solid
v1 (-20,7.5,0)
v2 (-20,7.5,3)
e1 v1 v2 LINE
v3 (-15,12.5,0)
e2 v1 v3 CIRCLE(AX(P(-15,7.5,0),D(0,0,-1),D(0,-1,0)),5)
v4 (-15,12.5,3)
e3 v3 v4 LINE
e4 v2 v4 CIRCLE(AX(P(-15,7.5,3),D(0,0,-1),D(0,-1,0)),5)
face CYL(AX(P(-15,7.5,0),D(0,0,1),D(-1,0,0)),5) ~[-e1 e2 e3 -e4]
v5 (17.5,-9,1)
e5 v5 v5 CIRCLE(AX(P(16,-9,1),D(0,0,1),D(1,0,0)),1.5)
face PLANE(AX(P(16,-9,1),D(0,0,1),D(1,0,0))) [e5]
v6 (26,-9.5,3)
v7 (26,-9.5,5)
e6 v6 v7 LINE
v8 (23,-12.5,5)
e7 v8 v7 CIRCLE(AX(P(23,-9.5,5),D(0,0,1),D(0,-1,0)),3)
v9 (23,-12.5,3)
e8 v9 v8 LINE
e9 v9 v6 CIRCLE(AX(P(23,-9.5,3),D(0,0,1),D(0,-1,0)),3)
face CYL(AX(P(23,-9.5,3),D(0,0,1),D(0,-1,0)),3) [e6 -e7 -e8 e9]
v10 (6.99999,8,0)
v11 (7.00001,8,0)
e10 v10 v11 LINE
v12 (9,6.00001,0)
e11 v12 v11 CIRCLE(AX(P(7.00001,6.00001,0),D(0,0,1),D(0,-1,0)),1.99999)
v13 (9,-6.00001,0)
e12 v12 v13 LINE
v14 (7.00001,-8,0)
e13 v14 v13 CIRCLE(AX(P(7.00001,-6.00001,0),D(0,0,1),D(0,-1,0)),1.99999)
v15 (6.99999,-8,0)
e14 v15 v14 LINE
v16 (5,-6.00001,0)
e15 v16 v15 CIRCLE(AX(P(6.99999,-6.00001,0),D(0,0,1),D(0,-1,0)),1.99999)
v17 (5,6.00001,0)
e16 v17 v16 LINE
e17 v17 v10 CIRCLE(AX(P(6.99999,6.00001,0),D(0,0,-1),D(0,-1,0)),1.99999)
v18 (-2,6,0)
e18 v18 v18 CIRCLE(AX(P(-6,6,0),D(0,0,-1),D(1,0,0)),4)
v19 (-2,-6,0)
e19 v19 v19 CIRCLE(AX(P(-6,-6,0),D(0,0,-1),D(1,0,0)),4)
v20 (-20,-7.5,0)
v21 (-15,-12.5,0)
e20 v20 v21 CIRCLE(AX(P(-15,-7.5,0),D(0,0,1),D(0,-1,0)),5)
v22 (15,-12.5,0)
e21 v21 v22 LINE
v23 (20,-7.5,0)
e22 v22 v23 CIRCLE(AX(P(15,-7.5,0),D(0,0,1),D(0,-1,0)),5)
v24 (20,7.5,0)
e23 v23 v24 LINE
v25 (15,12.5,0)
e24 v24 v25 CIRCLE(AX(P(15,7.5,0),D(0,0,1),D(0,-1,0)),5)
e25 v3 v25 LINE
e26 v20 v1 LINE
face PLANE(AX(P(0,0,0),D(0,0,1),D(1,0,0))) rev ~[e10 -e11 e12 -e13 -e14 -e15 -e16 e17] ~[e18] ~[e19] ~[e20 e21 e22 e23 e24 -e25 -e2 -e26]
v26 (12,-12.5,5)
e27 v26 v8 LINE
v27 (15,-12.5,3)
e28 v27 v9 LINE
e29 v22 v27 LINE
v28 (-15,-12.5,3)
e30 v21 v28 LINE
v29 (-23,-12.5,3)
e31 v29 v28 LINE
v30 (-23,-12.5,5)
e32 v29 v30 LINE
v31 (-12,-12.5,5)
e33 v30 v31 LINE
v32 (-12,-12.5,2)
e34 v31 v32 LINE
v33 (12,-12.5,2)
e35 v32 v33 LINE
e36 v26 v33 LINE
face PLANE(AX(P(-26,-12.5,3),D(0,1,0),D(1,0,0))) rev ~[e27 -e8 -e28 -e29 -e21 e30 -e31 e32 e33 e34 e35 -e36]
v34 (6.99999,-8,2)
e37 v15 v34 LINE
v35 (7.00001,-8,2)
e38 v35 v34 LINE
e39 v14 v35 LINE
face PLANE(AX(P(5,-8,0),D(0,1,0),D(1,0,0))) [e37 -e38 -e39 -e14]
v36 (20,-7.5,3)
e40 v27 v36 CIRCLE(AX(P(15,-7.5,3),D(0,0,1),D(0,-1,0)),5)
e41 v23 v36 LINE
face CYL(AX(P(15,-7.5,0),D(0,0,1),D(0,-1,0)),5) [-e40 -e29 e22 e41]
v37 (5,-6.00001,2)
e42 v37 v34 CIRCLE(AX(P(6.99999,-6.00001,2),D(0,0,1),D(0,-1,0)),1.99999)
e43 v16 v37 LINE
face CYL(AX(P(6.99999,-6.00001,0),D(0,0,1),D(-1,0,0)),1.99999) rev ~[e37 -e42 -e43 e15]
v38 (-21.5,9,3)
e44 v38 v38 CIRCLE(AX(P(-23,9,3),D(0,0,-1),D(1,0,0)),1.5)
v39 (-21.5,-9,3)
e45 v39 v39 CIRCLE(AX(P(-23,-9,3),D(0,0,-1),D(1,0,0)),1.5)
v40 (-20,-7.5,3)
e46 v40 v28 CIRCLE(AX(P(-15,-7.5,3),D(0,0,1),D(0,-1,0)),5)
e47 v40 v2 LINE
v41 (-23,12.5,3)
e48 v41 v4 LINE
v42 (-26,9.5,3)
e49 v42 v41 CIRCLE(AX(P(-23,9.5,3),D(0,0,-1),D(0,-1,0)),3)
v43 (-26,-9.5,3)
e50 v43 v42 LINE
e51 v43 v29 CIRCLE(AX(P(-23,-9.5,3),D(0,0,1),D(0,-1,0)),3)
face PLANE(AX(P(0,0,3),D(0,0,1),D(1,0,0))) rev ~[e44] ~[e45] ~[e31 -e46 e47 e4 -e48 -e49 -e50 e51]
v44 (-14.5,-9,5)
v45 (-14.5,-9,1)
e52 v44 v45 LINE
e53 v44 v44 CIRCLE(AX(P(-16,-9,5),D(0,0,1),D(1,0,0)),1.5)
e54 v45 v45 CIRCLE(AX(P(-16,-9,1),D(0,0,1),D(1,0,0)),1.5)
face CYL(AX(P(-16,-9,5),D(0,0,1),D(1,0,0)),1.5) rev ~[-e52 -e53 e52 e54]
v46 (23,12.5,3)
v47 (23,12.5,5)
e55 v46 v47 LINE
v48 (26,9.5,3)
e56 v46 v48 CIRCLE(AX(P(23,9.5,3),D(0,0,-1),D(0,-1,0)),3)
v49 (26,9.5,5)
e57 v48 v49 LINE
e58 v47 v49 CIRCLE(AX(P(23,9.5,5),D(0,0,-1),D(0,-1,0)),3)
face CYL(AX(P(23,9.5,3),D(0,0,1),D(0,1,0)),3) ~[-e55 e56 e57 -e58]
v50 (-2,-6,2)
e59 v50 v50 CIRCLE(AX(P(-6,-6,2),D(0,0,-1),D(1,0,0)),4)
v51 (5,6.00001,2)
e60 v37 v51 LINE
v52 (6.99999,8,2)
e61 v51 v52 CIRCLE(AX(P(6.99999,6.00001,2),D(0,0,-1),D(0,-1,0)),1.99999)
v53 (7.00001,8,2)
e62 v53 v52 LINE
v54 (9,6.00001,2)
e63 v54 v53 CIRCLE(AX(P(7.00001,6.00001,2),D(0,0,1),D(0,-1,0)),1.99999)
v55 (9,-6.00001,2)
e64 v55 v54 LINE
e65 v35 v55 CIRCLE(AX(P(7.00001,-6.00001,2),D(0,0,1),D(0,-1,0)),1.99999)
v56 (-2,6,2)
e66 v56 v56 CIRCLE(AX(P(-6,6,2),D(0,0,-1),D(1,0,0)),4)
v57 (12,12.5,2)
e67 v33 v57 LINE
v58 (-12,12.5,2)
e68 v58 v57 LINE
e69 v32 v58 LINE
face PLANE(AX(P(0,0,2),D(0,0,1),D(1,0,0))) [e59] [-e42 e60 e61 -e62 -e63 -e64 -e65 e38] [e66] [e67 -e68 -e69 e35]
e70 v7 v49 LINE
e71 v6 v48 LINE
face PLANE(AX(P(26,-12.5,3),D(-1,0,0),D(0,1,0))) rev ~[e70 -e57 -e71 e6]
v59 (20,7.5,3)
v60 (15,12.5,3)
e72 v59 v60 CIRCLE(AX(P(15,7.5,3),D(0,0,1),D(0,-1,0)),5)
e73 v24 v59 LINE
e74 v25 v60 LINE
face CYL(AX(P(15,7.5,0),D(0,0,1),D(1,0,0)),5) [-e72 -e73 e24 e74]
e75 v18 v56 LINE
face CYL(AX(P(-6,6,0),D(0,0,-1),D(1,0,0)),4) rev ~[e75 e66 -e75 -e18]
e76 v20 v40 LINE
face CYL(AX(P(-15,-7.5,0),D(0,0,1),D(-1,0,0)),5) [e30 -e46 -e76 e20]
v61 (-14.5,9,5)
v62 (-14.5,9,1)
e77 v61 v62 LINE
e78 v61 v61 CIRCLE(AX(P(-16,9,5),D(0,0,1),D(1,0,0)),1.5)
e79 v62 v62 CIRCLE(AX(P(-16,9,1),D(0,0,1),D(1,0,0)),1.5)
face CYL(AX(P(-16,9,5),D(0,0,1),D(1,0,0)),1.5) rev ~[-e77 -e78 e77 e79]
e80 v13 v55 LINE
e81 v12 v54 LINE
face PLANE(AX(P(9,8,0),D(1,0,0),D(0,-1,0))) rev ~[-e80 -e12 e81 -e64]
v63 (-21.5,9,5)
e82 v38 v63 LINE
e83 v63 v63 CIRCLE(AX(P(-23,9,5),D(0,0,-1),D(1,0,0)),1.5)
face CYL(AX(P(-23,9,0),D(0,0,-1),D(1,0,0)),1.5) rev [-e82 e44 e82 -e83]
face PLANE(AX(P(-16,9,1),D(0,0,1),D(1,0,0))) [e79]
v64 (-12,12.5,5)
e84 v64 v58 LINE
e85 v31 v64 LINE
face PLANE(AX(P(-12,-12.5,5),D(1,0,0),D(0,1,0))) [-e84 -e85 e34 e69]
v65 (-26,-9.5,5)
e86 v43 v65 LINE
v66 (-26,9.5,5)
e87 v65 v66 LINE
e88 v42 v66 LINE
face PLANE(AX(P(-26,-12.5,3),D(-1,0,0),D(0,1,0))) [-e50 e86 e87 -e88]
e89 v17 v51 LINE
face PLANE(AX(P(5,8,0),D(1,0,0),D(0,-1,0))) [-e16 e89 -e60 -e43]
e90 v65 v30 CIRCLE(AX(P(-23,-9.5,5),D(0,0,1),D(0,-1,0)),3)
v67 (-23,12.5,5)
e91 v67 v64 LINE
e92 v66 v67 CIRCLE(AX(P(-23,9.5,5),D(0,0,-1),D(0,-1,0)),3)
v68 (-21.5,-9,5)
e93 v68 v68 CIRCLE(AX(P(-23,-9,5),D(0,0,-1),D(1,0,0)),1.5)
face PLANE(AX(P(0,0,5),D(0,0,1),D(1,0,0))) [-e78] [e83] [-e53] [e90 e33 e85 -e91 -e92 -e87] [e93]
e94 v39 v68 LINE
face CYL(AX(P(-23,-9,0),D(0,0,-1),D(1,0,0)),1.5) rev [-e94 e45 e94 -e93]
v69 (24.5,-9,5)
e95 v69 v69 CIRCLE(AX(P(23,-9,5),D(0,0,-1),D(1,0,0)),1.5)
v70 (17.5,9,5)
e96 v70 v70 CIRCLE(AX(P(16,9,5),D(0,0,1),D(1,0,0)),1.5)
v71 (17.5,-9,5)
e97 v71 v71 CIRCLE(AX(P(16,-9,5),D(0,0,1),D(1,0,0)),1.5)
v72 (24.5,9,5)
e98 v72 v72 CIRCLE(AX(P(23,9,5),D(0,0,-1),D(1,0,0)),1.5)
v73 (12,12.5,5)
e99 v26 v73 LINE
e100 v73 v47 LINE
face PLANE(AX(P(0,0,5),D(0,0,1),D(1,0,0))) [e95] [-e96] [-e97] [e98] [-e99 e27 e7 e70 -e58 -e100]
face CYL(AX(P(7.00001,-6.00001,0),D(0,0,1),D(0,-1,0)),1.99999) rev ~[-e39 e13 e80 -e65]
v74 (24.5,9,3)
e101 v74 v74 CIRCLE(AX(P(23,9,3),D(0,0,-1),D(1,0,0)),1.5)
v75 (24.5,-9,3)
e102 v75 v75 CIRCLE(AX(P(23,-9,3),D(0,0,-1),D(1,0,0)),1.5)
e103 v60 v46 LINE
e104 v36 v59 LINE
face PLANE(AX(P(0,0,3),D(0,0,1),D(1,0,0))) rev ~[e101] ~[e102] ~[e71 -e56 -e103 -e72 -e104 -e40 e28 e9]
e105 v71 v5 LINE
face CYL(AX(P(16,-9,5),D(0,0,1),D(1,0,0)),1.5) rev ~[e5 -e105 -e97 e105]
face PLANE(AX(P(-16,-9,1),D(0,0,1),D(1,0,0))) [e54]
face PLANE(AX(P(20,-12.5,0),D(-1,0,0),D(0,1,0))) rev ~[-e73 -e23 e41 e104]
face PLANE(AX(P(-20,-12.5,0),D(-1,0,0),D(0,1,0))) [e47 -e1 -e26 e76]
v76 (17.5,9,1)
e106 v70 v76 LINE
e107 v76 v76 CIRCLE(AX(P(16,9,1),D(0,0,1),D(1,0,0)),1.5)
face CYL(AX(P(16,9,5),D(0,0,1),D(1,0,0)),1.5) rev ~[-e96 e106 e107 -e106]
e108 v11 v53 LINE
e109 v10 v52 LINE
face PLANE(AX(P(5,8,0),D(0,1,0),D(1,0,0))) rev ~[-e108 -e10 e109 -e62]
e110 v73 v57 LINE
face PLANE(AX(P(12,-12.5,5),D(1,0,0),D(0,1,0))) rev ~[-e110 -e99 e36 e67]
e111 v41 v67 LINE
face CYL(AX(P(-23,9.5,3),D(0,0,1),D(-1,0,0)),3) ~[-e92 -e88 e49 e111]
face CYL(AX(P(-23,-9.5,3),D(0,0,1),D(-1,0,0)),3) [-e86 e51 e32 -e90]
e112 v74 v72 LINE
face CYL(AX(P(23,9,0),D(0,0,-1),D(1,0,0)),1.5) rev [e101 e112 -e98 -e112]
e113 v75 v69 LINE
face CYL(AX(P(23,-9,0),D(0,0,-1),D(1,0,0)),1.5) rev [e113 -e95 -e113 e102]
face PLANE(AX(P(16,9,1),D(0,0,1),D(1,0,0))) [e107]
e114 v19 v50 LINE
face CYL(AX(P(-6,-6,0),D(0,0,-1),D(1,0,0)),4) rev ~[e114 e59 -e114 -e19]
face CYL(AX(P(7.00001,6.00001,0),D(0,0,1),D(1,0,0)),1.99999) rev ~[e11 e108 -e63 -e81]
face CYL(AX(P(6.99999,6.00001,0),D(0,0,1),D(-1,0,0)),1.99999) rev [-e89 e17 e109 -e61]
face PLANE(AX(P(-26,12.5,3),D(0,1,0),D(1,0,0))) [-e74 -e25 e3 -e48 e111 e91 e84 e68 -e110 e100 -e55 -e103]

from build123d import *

# Parameters (mm, degrees)
F0_W      = 40
F0_H      = 25
F1_DEPTH  = 3
F2_R      = 5
F3_W      = 52
F3_H      = 25
F4_DEPTH  = 2
F5_R      = 3
F6_R      = 1.5
F7_DEPTH  = 25
F8_R      = 1.5
F9_DEPTH  = 4
F10_W     = 24
F10_H     = 25
F11_DEPTH = 3
F12_W     = 4
F12_H     = 16
F12_R     = 4
F13_DEPTH = 25
F14_R     = 1.99999


# Not quite as in the source:
# - a fillet or chamfer is up to 0.001 mm smaller than in the source, because OpenCascade refuses the exact size


with BuildPart() as f1:
    # F0 (on Top) → F1 (new body)
    with BuildSketch(Plane.XY):
        Rectangle(F0_W, F0_H)
    extrude(amount=F1_DEPTH)

    # F2
    f2_edges = [f1.edges().sort_by_distance(p)[0] for p in [
        (-20, -12.5, 1.5),
        (-20, 12.5, 1.5),
        (20, -12.5, 1.5),
        (20, 12.5, 1.5),
    ]]
    fillet(f2_edges, radius=F2_R)

    # F3 (on face) → F4 (join)
    with BuildSketch(Plane.XY.offset(3)):
        Rectangle(F3_W, F3_H)
    extrude(amount=F4_DEPTH)

    # F5
    f5_edges = [f1.edges().sort_by_distance(p)[0] for p in [
        (26, 12.5, 4),
        (26, -12.5, 4),
        (-26, -12.5, 4),
        (-26, 12.5, 4),
    ]]
    fillet(f5_edges, radius=F5_R)

    # F6 (on Top) → F7 (cut)
    with BuildSketch(Plane.XY):
        with Locations((23, 9)):
            Circle(F6_R)
        with Locations((23, -9)):
            Circle(F6_R)
        with Locations((-23, -9)):
            Circle(F6_R)
        with Locations((-23, 9)):
            Circle(F6_R)
    extrude(amount=F7_DEPTH, mode=Mode.SUBTRACT)

    # F8 (on face) → F9 (cut)
    with BuildSketch(Plane.XY.offset(5)):
        with Locations((16, -9)):
            Circle(F8_R)
        with Locations((-16, -9)):
            Circle(F8_R)
        with Locations((-16, 9)):
            Circle(F8_R)
        with Locations((16, 9)):
            Circle(F8_R)
    extrude(amount=-F9_DEPTH, mode=Mode.SUBTRACT)

    # F10 (on face) → F11 (cut)
    with BuildSketch(Plane.XY.offset(5)):
        Rectangle(F10_W, F10_H)
    extrude(amount=-F11_DEPTH, mode=Mode.SUBTRACT)

    # F12 (on face) → F13 (cut)
    with BuildSketch(Plane(origin=(0, 0, 0), x_dir=(1, 0, 0), z_dir=(0, 0, -1))):
        with Locations((7, 0)):
            Rectangle(F12_W, F12_H)
        with Locations((-6, -6)):
            Circle(F12_R)
        with Locations((-6, 6)):
            Circle(F12_R)
    extrude(amount=-F13_DEPTH, mode=Mode.SUBTRACT)

    # F14 (radius 2 in the source; OpenCascade refuses exactly that, so slightly less here)
    f14_edges = [f1.edges().sort_by_distance(p)[0] for p in [
        (9, 8, 1),
        (5, 8, 1),
        (9, -8, 1),
        (5, -8, 1),
    ]]
    fillet(f14_edges, radius=F14_R)


solid = f1.part
